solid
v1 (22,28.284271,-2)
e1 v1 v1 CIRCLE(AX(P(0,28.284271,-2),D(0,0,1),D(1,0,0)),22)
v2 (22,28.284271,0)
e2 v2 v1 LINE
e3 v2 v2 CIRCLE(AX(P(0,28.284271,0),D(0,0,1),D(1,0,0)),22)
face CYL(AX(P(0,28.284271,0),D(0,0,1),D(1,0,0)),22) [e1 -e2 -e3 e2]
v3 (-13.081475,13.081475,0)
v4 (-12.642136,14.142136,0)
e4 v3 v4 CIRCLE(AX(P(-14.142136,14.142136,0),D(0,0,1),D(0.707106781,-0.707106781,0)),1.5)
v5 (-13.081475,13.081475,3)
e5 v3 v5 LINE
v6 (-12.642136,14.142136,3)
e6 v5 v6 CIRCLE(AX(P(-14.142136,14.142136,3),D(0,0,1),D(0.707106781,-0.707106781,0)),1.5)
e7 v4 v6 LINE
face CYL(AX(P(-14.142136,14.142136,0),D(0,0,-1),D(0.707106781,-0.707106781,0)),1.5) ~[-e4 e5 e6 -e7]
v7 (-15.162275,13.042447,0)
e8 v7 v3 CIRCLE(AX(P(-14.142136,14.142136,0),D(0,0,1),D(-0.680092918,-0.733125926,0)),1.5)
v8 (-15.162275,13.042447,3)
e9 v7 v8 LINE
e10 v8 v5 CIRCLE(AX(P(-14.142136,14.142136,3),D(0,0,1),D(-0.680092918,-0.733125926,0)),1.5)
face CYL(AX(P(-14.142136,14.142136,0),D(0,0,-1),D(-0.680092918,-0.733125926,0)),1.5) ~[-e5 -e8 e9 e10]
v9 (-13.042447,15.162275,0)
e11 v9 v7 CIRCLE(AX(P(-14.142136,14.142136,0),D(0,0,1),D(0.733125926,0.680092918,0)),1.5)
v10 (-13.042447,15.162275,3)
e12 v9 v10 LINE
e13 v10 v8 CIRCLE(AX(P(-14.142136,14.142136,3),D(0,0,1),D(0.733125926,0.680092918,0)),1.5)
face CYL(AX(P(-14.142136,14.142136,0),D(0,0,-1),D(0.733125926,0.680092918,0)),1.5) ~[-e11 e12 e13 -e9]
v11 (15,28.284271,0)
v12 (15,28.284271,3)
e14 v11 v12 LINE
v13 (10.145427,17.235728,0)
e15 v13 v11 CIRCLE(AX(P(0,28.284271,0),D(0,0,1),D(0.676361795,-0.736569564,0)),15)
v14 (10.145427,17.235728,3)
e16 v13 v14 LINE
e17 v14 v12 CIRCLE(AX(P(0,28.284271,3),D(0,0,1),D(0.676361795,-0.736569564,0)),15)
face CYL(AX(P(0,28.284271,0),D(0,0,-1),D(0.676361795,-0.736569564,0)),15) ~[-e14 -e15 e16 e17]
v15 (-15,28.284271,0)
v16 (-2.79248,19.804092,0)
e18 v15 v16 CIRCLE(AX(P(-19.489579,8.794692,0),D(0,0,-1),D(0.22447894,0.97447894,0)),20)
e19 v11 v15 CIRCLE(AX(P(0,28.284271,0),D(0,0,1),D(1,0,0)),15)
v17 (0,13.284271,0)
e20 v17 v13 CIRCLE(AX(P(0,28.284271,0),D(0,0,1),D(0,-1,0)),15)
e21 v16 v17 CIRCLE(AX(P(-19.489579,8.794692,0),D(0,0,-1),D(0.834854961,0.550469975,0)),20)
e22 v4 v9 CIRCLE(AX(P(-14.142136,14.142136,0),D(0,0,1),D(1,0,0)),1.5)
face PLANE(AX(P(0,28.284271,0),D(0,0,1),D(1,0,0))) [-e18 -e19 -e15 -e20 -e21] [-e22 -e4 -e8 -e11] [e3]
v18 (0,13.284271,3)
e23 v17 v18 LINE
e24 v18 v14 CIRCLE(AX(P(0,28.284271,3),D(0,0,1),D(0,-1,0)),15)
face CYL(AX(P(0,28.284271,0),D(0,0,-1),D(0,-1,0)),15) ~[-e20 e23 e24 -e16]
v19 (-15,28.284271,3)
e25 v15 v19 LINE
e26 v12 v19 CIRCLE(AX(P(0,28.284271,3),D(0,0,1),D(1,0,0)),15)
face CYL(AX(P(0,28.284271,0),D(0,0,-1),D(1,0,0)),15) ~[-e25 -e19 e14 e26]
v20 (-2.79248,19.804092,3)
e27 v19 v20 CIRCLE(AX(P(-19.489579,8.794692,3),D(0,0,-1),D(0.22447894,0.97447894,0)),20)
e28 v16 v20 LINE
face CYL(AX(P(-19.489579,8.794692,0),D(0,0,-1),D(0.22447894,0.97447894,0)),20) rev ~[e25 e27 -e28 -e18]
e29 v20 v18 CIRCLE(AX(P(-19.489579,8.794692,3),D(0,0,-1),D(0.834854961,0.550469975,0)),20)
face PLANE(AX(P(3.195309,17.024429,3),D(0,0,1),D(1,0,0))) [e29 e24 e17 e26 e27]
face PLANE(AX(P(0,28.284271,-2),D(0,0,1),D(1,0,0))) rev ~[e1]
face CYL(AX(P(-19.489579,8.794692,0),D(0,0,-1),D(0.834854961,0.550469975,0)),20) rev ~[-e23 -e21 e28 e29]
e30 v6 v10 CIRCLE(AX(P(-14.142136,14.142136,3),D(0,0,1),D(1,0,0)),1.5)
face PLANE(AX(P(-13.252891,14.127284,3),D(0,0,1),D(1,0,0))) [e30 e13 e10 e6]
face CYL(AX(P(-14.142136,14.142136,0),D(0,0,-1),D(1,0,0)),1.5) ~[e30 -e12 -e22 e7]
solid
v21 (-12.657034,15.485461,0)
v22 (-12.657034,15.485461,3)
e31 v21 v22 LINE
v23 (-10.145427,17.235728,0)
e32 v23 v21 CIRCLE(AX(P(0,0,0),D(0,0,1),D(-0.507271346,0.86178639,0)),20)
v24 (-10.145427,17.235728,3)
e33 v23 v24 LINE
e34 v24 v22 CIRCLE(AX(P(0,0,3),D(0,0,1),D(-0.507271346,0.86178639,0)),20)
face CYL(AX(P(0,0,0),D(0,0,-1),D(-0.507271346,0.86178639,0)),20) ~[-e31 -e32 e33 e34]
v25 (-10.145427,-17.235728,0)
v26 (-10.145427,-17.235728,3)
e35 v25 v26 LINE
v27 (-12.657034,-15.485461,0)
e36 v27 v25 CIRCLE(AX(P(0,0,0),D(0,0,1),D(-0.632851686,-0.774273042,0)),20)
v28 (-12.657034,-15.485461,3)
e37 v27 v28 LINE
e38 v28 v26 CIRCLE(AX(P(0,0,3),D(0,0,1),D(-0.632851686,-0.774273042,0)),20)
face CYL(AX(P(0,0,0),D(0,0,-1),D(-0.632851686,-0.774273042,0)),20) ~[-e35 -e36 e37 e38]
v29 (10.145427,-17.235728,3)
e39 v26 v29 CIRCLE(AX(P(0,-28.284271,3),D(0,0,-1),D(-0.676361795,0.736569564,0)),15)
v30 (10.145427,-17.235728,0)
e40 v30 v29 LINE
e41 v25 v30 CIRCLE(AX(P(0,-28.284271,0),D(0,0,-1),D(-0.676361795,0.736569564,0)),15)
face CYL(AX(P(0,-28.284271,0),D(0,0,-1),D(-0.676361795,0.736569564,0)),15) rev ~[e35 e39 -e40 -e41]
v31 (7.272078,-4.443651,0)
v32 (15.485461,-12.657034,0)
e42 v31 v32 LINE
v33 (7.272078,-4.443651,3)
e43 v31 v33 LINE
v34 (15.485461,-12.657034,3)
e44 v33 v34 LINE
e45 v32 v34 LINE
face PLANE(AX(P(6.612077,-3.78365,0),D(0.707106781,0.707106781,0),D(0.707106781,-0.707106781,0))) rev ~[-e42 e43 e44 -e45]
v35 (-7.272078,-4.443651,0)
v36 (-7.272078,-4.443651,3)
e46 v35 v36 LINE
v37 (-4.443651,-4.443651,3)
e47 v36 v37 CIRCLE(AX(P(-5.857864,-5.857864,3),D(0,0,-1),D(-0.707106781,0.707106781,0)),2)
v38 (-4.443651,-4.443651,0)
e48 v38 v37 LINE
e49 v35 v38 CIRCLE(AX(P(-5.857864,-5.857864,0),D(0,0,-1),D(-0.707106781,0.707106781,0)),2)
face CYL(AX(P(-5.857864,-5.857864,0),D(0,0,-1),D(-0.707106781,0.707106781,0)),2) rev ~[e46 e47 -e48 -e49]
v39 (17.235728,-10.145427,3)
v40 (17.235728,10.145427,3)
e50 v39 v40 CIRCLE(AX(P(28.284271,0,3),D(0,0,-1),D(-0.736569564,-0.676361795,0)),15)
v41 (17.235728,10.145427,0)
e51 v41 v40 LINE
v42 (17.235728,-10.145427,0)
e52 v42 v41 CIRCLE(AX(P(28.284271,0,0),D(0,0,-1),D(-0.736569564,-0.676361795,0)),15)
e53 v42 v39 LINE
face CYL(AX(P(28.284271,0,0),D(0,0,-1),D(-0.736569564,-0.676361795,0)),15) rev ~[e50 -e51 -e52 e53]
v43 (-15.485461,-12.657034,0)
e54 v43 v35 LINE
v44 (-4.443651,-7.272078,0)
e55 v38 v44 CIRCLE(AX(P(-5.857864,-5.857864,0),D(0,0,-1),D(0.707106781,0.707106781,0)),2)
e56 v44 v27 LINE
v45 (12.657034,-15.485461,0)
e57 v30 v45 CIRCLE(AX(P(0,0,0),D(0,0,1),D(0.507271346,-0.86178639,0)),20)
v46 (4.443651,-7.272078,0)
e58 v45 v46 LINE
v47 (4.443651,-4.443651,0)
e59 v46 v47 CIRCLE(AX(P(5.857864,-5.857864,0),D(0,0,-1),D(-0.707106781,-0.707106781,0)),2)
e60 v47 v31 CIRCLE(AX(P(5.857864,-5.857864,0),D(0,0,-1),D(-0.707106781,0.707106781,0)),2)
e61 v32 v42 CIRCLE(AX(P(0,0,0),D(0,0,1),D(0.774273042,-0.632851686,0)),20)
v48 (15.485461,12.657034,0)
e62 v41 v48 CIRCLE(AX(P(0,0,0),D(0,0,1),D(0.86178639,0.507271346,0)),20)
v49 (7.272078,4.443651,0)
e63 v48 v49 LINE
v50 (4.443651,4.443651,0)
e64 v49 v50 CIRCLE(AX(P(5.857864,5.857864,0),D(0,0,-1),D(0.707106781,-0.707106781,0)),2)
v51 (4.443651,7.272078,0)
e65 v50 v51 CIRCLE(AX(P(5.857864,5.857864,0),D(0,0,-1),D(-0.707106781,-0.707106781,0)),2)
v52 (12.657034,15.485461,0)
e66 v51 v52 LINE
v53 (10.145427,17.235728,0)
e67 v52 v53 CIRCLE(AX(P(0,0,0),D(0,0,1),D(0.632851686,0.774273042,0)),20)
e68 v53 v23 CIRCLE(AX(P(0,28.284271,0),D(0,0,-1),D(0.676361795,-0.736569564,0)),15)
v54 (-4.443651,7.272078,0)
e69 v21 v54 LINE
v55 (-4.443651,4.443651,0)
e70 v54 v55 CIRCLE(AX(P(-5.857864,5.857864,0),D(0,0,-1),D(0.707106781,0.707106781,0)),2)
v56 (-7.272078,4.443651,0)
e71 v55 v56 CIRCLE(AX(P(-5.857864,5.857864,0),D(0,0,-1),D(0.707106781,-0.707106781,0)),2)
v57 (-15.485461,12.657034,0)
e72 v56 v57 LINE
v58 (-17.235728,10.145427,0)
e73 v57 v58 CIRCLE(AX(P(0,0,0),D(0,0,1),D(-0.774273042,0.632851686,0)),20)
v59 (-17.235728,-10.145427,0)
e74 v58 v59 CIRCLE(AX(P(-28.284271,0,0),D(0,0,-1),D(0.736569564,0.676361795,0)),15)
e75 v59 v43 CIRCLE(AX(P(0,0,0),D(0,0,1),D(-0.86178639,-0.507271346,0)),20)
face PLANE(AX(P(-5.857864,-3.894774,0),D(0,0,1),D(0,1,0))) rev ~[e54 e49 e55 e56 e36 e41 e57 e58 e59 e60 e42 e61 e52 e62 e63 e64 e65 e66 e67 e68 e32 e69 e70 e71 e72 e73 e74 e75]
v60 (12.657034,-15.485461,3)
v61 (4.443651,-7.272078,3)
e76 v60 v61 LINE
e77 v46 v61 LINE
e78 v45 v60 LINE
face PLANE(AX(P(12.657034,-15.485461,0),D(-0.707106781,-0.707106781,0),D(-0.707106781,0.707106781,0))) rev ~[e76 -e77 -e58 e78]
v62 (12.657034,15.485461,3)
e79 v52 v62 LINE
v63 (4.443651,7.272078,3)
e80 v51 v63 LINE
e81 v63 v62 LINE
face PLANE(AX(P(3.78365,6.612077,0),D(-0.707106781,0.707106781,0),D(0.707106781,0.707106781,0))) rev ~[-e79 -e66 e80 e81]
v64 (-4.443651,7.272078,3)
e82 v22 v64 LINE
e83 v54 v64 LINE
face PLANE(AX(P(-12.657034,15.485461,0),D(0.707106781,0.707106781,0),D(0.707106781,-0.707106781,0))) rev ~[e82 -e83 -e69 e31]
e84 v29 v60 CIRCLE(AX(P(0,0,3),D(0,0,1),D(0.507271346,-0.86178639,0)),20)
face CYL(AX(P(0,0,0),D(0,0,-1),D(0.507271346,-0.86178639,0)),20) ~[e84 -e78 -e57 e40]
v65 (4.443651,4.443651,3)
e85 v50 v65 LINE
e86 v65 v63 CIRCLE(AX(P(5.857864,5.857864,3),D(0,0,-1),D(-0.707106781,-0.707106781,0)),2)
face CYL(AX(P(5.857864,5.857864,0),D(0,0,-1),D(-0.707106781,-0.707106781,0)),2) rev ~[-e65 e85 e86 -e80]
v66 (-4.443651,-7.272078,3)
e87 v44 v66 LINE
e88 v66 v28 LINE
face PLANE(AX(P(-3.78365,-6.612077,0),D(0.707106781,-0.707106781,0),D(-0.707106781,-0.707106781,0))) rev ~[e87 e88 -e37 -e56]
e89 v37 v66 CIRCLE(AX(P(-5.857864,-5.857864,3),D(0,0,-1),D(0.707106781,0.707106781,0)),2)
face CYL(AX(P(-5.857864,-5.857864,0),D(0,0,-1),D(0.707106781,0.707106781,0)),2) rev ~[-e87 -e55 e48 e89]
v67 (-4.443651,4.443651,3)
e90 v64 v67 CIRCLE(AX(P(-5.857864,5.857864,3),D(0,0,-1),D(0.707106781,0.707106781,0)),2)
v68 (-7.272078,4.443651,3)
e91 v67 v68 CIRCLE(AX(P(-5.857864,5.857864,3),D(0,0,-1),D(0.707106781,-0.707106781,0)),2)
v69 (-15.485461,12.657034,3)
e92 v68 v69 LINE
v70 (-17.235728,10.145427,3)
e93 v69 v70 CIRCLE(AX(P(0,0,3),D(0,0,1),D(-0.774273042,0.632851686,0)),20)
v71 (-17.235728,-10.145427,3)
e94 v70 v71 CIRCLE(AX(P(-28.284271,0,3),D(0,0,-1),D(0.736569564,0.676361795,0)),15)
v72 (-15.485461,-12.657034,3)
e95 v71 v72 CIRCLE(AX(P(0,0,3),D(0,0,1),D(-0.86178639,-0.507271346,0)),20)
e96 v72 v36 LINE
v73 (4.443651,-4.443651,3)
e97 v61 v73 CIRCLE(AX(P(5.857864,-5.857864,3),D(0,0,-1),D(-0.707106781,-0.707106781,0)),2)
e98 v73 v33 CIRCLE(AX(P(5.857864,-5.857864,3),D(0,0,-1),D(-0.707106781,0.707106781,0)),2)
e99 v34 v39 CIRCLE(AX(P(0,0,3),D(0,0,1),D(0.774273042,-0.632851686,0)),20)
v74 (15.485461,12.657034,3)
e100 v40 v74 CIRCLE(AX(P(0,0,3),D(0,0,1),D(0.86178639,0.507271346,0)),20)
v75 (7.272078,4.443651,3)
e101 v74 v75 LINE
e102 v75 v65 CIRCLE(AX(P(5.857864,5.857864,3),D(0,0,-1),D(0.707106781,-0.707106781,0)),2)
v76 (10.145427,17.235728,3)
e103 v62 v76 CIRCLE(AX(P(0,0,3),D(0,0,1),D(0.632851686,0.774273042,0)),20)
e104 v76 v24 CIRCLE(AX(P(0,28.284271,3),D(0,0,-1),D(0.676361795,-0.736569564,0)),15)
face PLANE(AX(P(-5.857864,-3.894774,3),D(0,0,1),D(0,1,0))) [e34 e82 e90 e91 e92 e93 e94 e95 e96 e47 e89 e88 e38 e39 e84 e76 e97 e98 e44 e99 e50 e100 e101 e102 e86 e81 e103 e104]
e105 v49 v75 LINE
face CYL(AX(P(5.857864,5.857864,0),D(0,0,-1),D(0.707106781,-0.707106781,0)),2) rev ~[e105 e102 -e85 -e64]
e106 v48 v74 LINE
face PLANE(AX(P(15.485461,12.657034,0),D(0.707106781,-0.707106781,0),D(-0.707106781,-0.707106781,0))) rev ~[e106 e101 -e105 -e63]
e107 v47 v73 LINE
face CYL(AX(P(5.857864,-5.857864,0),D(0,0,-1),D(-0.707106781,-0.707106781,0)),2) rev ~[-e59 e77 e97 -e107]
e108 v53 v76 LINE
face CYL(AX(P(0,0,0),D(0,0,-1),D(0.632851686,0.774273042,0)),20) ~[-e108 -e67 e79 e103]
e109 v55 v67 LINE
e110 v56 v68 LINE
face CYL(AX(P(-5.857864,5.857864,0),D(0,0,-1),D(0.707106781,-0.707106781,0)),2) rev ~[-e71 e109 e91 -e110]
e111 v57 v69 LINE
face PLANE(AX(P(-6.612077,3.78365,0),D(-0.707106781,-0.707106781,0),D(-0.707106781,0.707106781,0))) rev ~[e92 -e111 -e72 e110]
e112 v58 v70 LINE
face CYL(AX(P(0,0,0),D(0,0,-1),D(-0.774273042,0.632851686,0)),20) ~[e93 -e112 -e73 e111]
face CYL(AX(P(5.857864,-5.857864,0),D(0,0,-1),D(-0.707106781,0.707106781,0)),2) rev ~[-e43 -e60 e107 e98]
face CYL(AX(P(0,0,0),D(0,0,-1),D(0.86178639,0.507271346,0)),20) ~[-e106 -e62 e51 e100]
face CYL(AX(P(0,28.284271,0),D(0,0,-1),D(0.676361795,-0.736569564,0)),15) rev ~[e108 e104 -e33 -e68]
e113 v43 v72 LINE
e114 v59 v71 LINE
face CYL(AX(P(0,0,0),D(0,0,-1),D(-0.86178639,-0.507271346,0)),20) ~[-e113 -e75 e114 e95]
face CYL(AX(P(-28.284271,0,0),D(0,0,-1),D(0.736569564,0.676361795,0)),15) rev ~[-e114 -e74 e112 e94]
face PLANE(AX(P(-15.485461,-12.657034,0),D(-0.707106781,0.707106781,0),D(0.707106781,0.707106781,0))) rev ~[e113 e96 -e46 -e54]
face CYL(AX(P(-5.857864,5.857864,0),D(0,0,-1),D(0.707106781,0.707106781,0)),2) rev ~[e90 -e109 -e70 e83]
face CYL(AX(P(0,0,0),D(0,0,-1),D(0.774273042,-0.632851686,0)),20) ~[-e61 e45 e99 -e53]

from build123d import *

# Parameters (mm, degrees)
F1_DEPTH    = 3
F2_T1_DEPTH = 3
F3_COUNT    = 4
F4_DEPTH    = 3
F5_R        = 22
F6_DEPTH    = 2
F7_DEPTH    = 3


# Not quite as in the source:
# - a fillet or chamfer that OpenCascade refuses, or shapes differently, is made with other operations: its cross-section is extruded or revolved along the edge and cut away or added


with BuildPart() as f1:
    # F0 (on Top) → F1 (new body)
    with BuildSketch(Plane.XY):
        with BuildLine():
            ThreePointArc((12.6570337171, 15.4854608418), (11.43476766, 16.4087198941), (10.1454269255, 17.2357277914))
            ThreePointArc((10.1454269255, 17.2357277914), (5.443888691, 14.3070012737), (0, 13.2842712475))
            ThreePointArc((0, 13.2842712475), (-5.443888691, 14.3070012737), (-10.1454269255, 17.2357277914))
            ThreePointArc((-10.1454269255, 17.2357277914), (-11.43476766, 16.4087198941), (-12.6570337171, 15.4854608418))
            Line((-12.6570337171, 15.4854608418), (-3.7836501514, 6.6120772761))
            ThreePointArc((-3.7836501514, 6.6120772761), (0, 6.2842712475), (3.7836501514, 6.6120772761))
            Line((3.7836501514, 6.6120772761), (12.6570337171, 15.4854608418))
        make_face()
        with BuildLine():
            Line((3.0294372515, 5.8578643763), (3.7836501514, 6.6120772761))
            ThreePointArc((3.7836501514, 6.6120772761), (0, 6.2842712475), (-3.7836501514, 6.6120772761))
            Line((-3.7836501514, 6.6120772761), (-3.0294372515, 5.8578643763))
            Line((-3.0294372515, 5.8578643763), (-4.4436508139, 4.4436508139))
            Line((-4.4436508139, 4.4436508139), (0, 0))
            Line((0, 0), (4.4436508139, 4.4436508139))
            Line((4.4436508139, 4.4436508139), (3.0294372515, 5.8578643763))
        make_face()
    extrude(amount=F1_DEPTH)

    # F2: fillet of radius 2 on 2 edges, made by hand

    # F2_s2 → F2_t1 (join)
    with BuildSketch(Plane.XY):
        with BuildLine():
            ThreePointArc((-4.4436508139, 7.2720779386), (-3.8578643763, 5.8578643763), (-4.4436508139, 4.4436508139))
            Line((-4.4436508139, 4.4436508139), (-3.0294372515, 5.8578643763))
            Line((-3.0294372515, 5.8578643763), (-4.4436508139, 7.2720779386))
        make_face()
        with BuildLine():
            ThreePointArc((4.4436508139, 4.4436508139), (3.8578643763, 5.8578643763), (4.4436508139, 7.2720779386))
            Line((4.4436508139, 7.2720779386), (3.0294372515, 5.8578643763))
            Line((3.0294372515, 5.8578643763), (4.4436508139, 4.4436508139))
        make_face()
    extrude(amount=F2_T1_DEPTH)

    # F3: F1 ×4 about axis
    f3_axis = Axis((0, 0, 1.5), (0, 0, -1))


with BuildPart() as f1_1:
    add(f1.part)
    for i in range(1, F3_COUNT):
        add(f1.part.rotate(f3_axis, i * 360 / F3_COUNT))


with BuildPart() as f4:
    # F0 (on Top) → F4 (new body)
    with BuildSketch(Plane.XY):
        with BuildLine():
            ThreePointArc((10.1454269255, 17.2357277914), (13.7328329904, 22.2502594759), (15, 28.2842712475))
            ThreePointArc((15, 28.2842712475), (0, 43.2842712475), (-15, 28.2842712475))
            ThreePointArc((-15, 28.2842712475), (-8.079180403, 25.220367714), (-2.7924795837, 19.8040919452))
            ThreePointArc((-2.7924795837, 19.8040919452), (3.8943012543, 19.6171969899), (10.1454269255, 17.2357277914))
        make_face()
    extrude(amount=F4_DEPTH)



with BuildPart() as f4b:
    # F0 (on Top) → F4, piece 2 (new body)
    with BuildSketch(Plane.XY):
        with BuildLine():
            ThreePointArc((-12.6421356237, 14.1421356237), (-12.7457951685, 14.6900711429), (-13.0424467346, 15.162275))
            ThreePointArc((-13.0424467346, 15.162275), (-13.6018583504, 14.6625185222), (-14.1421356237, 14.1421356237))
            Line((-14.1421356237, 14.1421356237), (-13.081475452, 13.081475452))
            ThreePointArc((-13.081475452, 13.081475452), (-12.756316325, 13.5681104752), (-12.6421356237, 14.1421356237))
        make_face()
    extrude(amount=F4_DEPTH)


with BuildPart() as f4_1:
    add(f4.part)

    add(f4b.part)  # F6 merges F4b
    # F5 (on Top) → F6 (join)
    with BuildSketch(Plane.XY):
        with Locations((0, 28.2842712475)):
            Circle(F5_R)
    extrude(amount=-F6_DEPTH)

    # F0 (on Top) → F7 (join)
    with BuildSketch(Plane.XY):
        with BuildLine():
            ThreePointArc((0, 13.2842712475), (5.443888691, 14.3070012737), (10.1454269255, 17.2357277914))
            ThreePointArc((10.1454269255, 17.2357277914), (3.8943012543, 19.6171969899), (-2.7924795837, 19.8040919452))
            ThreePointArc((-2.7924795837, 19.8040919452), (-1.1049131261, 16.6689586115), (0, 13.2842712475))
        make_face()
        with BuildLine():
            ThreePointArc((-14.1421356237, 14.1421356237), (-13.6018583504, 14.6625185222), (-13.0424467346, 15.162275))
            ThreePointArc((-13.0424467346, 15.162275), (-15.2027957955, 15.2027957955), (-15.162275, 13.0424467346))
            ThreePointArc((-15.162275, 13.0424467346), (-14.6625185222, 13.6018583504), (-14.1421356237, 14.1421356237))
        make_face()
        with BuildLine():
            Line((-13.081475452, 13.081475452), (-14.1421356237, 14.1421356237))
            ThreePointArc((-14.1421356237, 14.1421356237), (-14.6625185222, 13.6018583504), (-15.162275, 13.0424467346))
            ThreePointArc((-15.162275, 13.0424467346), (-14.1140056768, 12.6423994116), (-13.081475452, 13.081475452))
        make_face()
    extrude(amount=F7_DEPTH)


solid = Compound([f1_1.part, f4_1.part])
